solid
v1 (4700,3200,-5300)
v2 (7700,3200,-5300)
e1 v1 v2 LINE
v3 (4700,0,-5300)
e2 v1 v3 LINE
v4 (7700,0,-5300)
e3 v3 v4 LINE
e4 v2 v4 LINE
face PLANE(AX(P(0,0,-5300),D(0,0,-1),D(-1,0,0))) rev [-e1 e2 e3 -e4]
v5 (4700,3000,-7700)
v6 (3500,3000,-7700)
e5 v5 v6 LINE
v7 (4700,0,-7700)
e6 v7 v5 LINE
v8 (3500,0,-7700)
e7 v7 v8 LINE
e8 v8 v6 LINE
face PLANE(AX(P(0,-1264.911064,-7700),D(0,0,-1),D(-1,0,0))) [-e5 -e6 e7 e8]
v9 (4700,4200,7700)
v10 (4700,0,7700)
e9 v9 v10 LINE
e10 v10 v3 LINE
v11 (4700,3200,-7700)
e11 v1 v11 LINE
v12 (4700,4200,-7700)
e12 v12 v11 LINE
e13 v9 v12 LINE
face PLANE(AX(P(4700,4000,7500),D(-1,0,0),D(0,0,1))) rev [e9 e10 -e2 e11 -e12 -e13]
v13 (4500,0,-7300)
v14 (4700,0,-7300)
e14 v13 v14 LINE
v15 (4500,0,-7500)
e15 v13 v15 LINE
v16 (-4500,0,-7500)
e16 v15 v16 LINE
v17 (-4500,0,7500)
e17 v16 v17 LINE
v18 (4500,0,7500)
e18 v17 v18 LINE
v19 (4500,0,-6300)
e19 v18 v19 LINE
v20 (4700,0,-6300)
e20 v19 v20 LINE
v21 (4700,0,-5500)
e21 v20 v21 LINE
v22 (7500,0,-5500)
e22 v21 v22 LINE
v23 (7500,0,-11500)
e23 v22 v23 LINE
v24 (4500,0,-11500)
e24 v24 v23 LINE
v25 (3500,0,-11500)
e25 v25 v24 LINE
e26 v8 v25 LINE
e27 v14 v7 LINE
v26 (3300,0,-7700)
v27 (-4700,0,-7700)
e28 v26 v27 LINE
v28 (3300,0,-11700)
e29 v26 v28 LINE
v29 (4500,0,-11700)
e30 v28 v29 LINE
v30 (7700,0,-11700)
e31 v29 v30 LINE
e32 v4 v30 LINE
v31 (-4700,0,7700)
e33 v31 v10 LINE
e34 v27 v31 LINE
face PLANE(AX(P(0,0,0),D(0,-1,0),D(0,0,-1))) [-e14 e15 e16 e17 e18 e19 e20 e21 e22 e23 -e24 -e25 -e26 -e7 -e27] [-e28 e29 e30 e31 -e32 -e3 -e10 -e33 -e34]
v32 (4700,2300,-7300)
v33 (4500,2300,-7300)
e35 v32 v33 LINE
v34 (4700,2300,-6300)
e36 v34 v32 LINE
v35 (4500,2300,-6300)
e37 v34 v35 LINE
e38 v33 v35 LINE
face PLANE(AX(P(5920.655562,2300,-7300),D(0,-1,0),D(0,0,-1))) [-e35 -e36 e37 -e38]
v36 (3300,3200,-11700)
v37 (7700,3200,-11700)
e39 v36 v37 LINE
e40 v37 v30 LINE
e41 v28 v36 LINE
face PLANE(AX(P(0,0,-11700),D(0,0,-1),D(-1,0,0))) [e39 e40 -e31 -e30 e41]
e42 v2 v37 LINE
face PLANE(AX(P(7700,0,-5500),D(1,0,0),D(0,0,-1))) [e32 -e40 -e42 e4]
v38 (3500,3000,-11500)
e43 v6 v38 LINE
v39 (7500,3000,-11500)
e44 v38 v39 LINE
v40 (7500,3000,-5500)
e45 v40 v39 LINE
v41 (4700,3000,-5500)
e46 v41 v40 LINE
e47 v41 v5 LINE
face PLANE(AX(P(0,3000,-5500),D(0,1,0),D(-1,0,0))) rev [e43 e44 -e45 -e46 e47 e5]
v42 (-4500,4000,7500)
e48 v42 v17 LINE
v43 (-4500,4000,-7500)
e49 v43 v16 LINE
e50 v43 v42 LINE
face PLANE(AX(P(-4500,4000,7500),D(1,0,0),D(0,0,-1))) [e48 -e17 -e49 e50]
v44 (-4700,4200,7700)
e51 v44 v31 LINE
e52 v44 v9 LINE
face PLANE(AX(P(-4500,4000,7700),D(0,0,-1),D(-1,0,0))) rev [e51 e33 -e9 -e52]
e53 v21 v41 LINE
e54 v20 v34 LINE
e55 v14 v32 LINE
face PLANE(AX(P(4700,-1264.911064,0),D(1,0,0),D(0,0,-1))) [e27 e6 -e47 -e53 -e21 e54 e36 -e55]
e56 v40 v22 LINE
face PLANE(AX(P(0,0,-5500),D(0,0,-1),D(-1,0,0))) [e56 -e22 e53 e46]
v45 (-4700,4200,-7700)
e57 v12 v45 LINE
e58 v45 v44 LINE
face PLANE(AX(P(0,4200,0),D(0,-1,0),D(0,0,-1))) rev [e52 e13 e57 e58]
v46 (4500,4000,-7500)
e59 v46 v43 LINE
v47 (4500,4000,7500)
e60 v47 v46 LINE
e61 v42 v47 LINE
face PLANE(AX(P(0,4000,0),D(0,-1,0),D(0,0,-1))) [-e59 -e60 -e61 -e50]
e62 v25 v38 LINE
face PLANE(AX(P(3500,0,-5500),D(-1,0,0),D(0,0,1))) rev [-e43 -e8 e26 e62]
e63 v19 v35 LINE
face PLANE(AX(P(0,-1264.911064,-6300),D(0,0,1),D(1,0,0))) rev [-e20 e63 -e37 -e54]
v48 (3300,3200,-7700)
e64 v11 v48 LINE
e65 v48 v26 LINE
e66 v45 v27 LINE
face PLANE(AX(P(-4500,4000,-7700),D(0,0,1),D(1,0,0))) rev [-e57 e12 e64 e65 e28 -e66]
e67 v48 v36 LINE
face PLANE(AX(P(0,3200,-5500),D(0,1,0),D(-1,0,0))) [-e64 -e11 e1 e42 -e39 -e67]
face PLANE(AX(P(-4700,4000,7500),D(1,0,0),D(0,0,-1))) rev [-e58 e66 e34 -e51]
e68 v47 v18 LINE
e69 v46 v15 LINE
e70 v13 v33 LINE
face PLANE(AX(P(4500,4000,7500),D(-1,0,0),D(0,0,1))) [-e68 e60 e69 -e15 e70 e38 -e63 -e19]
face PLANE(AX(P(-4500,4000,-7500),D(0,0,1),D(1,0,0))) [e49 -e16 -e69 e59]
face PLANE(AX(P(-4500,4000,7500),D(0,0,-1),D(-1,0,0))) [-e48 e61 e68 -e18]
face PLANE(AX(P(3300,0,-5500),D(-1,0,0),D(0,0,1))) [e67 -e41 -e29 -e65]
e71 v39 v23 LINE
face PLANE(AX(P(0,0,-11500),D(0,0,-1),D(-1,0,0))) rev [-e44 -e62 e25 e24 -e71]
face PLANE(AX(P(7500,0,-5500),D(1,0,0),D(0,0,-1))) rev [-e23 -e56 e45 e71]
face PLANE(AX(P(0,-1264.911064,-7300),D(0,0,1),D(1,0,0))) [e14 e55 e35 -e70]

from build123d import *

# Parameters (mm, degrees)
SKETCH1_W                        = 9000
SKETCH1_H                        = 15000
BOSS_EXTRUDE1_DEPTH              = 4000
BOSS_EXTRUDE2_DEPTH              = 4000
BOSS_EXTRUDE2_DEPTH_BACK         = 2000
SKETCH2_W                        = 3000
SKETCH2_H                        = 3000
SKETCH2_W_2                      = 1000
SKETCH3_W                        = 11000
SKETCH3_H                        = 7000
BOSS_EXTRUDE3_DEPTH              = 12500
SKETCH4_W                        = 7000
SKETCH4_H                        = 4000
BOSS_EXTRUDE4_DEPTH              = 1500
SKETCH5_W                        = 10000
SKETCH5_H                        = 4000
BOSS_EXTRUDE5_DEPTH              = 12000
SKETCH6_R                        = 2000
BOSS_EXTRUDE6_DEPTH              = 6000
BOSS_EXTRUDE8_DEPTH              = 10000
BOSS_EXTRUDE8_DEPTH_BACK         = 4000
SKETCH9_R                        = 7500
REVOLVE5_ANGLE                   = 180
BOSS_EXTRUDE9_START              = 40000
BOSS_EXTRUDE9_DEPTH              = 40000
BOSS_EXTRUDE11_REACH             = 44869.165
SKETCH16_R                       = 7500
BOSS_EXTRUDE11_DIRECTION_2_DEPTH = 20000
BOSS_EXTRUDE12_DEPTH             = 10000
FILLET1_R                        = 1000
FILLET2_R                        = 1000
SKETCH19_W                       = 3000
SKETCH19_H                       = 6000
CUT_EXTRUDE1_DEPTH               = 8500
CUT_EXTRUDE2_DEPTH               = 65678.168408597
CUT_EXTRUDE2_DEPTH_BACK          = 65678.168408597
CUT_EXTRUDE5_START               = -6000
CUT_EXTRUDE5_DEPTH               = 24250
SHELL1_T                         = 200
SKETCH23_W                       = 1000
SKETCH23_H                       = 200
SKETCH23_W_2                     = 200
SKETCH23_H_2                     = 800
BOSS_EXTRUDE13_DEPTH             = 3000
SKETCH24_W                       = 1000
SKETCH24_H                       = 700
BOSS_EXTRUDE14_DEPTH             = 200


# Read off the part's stored shape, not the designer's step: Cut-Extrude5
with BuildPart() as part:
    # Sketch1 → Boss-Extrude1 (new body)
    with BuildSketch(Plane(origin=(0, 0, 0), x_dir=(1, 0, 0), z_dir=(0, 1, 0))):
        Rectangle(SKETCH1_W, SKETCH1_H)
    extrude(amount=BOSS_EXTRUDE1_DEPTH)

    # Sketch2 → Boss-Extrude2 (add, two sides: drawn at the far end of the back side and taken through both)
    with BuildSketch(Plane(origin=(0, 0, -7500), x_dir=(-1, 0, 0), z_dir=(0, 0, -1)).offset(-BOSS_EXTRUDE2_DEPTH_BACK)):
        with Locations((-6000, 1500)):
            Rectangle(SKETCH2_W, SKETCH2_H)
        with Locations((-4000, 1500)):
            Rectangle(SKETCH2_W_2, SKETCH2_H)
    extrude(amount=BOSS_EXTRUDE2_DEPTH + BOSS_EXTRUDE2_DEPTH_BACK)

    # Sketch3 → Boss-Extrude3 (add)
    with BuildSketch(Plane.XZ):
        with Locations((5000, -8000)):
            Rectangle(SKETCH3_W, SKETCH3_H)
    extrude(amount=BOSS_EXTRUDE3_DEPTH)

    # Sketch4 → Boss-Extrude4 (add)
    with BuildSketch(Plane.XZ.offset(12500)):
        with Locations((7000, -9500)):
            Rectangle(SKETCH4_W, SKETCH4_H)
    extrude(amount=BOSS_EXTRUDE4_DEPTH)

    # Sketch5 → Boss-Extrude5 (add)
    with BuildSketch(Plane.XY.offset(-4500)):
        with Locations((4500, -10500)):
            Rectangle(SKETCH5_W, SKETCH5_H)
    extrude(amount=BOSS_EXTRUDE5_DEPTH)

    # Sketch6 → Boss-Extrude6 (add)
    with BuildSketch(Plane(origin=(9500, 0, 0), x_dir=(0, 0, -1), z_dir=(1, 0, 0))):
        with Locations(Location((-5250, -11500, 0), (0, 0, 210))):
            Circle(SKETCH6_R)
    extrude(amount=BOSS_EXTRUDE6_DEPTH)

    # Sketch9 → Boss-Extrude8 (add, two sides: drawn at the far end of the back side and taken through both)
    with BuildSketch(Plane(origin=(0, -10500, 0), x_dir=(-1, 0, 0), z_dir=(0, -1, 0)).offset(-BOSS_EXTRUDE8_DEPTH_BACK)):
        with Locations(Location((-22728.4161474, -5250, 0), (0, 0, 90))):
            Circle(SKETCH9_R)
    extrude(amount=BOSS_EXTRUDE8_DEPTH + BOSS_EXTRUDE8_DEPTH_BACK)

    # Sketch10 → Revolve5 (revolve)
    with BuildSketch(Plane(origin=(0, -6500, 0), x_dir=(1, 0, 0), z_dir=(0, 1, 0))):
        with BuildLine():
            Line((15228.4161474, -5250), (30228.4161474, -5250))
            ThreePointArc((30228.4161474, -5250), (22728.4161474, 2250), (15228.4161474, -5250))
        make_face()
    revolve(axis=Axis((15228.4161474, -6500, 5250), (1, 0, 0)), revolution_arc=REVOLVE5_ANGLE)

    # Sketch12 → Boss-Extrude9 (add)
    with BuildSketch(Plane.ZY.offset(500).offset(BOSS_EXTRUDE9_START)):
        with BuildLine():
            ThreePointArc((3517.949192431, -12500), (5250, -13500), (6982.050807569, -12500))
            ThreePointArc((6982.050807569, -12500), (5250, -9500), (3517.949192431, -12500))
        make_face()
    extrude(amount=-BOSS_EXTRUDE9_DEPTH)

    # Boss-Extrude11: up to this face of the body (flat: up to its plane)
    boss_extrude11_end = Plane(part.part.faces().sort_by_distance((-250, 0, 750))[0])
    # Sketch16 → Boss-Extrude11 (add, up to the picked face)
    with BuildSketch(Plane(origin=(0, -10500, 0), x_dir=(-1, 0, 0), z_dir=(0, -1, 0)), mode=Mode.PRIVATE) as boss_extrude11_sk1:
        with Locations(Location((47728.4161474, -5250, 0), (0, 0, 90))):
            Circle(SKETCH16_R)
    boss_extrude11_tool1 = split(extrude(boss_extrude11_sk1.sketch, amount=-BOSS_EXTRUDE11_REACH, mode=Mode.PRIVATE), bisect_by=boss_extrude11_end, keep=Keep.BOTH, mode=Mode.PRIVATE)
    add(boss_extrude11_tool1.solids().sort_by(Axis((-47728.416147, -10500, 5250), (0, 1, 0)))[0])

    # Sketch16 → Boss-Extrude11 direction 2 (add)
    with BuildSketch(Plane(origin=(0, -10500, 0), x_dir=(-1, 0, 0), z_dir=(0, -1, 0))):
        with Locations(Location((47728.4161474, -5250, 0), (0, 0, 90))):
            Circle(SKETCH16_R)
    extrude(amount=BOSS_EXTRUDE11_DIRECTION_2_DEPTH)

    # Sketch18 → Boss-Extrude12 (add)
    with BuildSketch(Plane(origin=(-500, 0, 0), x_dir=(0, 0, -1), z_dir=(1, 0, 0))):
        with BuildLine():
            Line((-3517.949192431, -12500), (-6982.050807569, -12500))
            ThreePointArc((-6982.050807569, -12500), (-5250, -13500), (-3517.949192431, -12500))
        make_face()
    extrude(amount=BOSS_EXTRUDE12_DEPTH)

    # Fillet1
    fillet1_edges = [part.edges().sort_by_distance(p)[0] for p in [
        (22728.4161474, -20500, 12750),
    ]]
    fillet(fillet1_edges, radius=FILLET1_R)

    # Fillet2
    fillet2_edges = [part.edges().sort_by_distance(p)[0] for p in [
        (-47728.4161474, -30500, 12750),
    ]]
    fillet(fillet2_edges, radius=FILLET2_R)

    # Sketch19 → Cut-Extrude1 (cut)
    with BuildSketch(Plane(origin=(0, 0, 0), x_dir=(1, 0, 0), z_dir=(0, 1, 0))):
        with Locations((9000, 8500)):
            Rectangle(SKETCH19_W, SKETCH19_H)
    extrude(amount=-CUT_EXTRUDE1_DEPTH, mode=Mode.SUBTRACT)

    # Sketch20 → Cut-Extrude2 (cut, two sides: drawn at the far end of the back side and taken through both)
    with BuildSketch(Plane(origin=(0, 0, -5500), x_dir=(-1, 0, 0), z_dir=(0, 0, -1)).offset(-CUT_EXTRUDE2_DEPTH_BACK)):
        Polygon((-10500, 0), (-10500, -8500), (-7500, -7500), (-7500, 0), align=None)
    extrude(amount=CUT_EXTRUDE2_DEPTH + CUT_EXTRUDE2_DEPTH_BACK, mode=Mode.SUBTRACT)

    # Cut-Extrude5 outline → Cut-Extrude5 (cut)
    with BuildSketch(Plane.XY.offset(-5500).offset(CUT_EXTRUDE5_START)):
        Polygon((-500, 0), (-500, -4833.333333333), (-15000, 0), (-55230, 0), (-55230, -30500), (30230, -30500), (30230, 1001), (7500, 1001), (7500, 0), align=None)
    extrude(amount=CUT_EXTRUDE5_DEPTH, mode=Mode.SUBTRACT)

    # Shell1
    shell1_openings = [part.faces().sort_by_distance(p)[0] for p in [
        (789.808917197, 0, -1216.560509554),
    ]]
    offset(amount=SHELL1_T, openings=shell1_openings, kind=Kind.INTERSECTION)

    # Sketch23 → Boss-Extrude13 (add)
    with BuildSketch(Plane.XZ.offset(-3000)):
        Polygon((4500, -7300), (4500, -7500), (4500, -7700), (4700, -7700), (4700, -7300), align=None)
        with Locations((4000, -7600)):
            Rectangle(SKETCH23_W, SKETCH23_H)
        with Locations((4600, -5900)):
            Rectangle(SKETCH23_W_2, SKETCH23_H_2)
    extrude(amount=BOSS_EXTRUDE13_DEPTH)

    # Sketch24 → Boss-Extrude14 (add)
    with BuildSketch(Plane.ZY.offset(-4500)):
        with Locations((-6800, 2650)):
            Rectangle(SKETCH24_W, SKETCH24_H)
    extrude(amount=-BOSS_EXTRUDE14_DEPTH)


solid = part.part
